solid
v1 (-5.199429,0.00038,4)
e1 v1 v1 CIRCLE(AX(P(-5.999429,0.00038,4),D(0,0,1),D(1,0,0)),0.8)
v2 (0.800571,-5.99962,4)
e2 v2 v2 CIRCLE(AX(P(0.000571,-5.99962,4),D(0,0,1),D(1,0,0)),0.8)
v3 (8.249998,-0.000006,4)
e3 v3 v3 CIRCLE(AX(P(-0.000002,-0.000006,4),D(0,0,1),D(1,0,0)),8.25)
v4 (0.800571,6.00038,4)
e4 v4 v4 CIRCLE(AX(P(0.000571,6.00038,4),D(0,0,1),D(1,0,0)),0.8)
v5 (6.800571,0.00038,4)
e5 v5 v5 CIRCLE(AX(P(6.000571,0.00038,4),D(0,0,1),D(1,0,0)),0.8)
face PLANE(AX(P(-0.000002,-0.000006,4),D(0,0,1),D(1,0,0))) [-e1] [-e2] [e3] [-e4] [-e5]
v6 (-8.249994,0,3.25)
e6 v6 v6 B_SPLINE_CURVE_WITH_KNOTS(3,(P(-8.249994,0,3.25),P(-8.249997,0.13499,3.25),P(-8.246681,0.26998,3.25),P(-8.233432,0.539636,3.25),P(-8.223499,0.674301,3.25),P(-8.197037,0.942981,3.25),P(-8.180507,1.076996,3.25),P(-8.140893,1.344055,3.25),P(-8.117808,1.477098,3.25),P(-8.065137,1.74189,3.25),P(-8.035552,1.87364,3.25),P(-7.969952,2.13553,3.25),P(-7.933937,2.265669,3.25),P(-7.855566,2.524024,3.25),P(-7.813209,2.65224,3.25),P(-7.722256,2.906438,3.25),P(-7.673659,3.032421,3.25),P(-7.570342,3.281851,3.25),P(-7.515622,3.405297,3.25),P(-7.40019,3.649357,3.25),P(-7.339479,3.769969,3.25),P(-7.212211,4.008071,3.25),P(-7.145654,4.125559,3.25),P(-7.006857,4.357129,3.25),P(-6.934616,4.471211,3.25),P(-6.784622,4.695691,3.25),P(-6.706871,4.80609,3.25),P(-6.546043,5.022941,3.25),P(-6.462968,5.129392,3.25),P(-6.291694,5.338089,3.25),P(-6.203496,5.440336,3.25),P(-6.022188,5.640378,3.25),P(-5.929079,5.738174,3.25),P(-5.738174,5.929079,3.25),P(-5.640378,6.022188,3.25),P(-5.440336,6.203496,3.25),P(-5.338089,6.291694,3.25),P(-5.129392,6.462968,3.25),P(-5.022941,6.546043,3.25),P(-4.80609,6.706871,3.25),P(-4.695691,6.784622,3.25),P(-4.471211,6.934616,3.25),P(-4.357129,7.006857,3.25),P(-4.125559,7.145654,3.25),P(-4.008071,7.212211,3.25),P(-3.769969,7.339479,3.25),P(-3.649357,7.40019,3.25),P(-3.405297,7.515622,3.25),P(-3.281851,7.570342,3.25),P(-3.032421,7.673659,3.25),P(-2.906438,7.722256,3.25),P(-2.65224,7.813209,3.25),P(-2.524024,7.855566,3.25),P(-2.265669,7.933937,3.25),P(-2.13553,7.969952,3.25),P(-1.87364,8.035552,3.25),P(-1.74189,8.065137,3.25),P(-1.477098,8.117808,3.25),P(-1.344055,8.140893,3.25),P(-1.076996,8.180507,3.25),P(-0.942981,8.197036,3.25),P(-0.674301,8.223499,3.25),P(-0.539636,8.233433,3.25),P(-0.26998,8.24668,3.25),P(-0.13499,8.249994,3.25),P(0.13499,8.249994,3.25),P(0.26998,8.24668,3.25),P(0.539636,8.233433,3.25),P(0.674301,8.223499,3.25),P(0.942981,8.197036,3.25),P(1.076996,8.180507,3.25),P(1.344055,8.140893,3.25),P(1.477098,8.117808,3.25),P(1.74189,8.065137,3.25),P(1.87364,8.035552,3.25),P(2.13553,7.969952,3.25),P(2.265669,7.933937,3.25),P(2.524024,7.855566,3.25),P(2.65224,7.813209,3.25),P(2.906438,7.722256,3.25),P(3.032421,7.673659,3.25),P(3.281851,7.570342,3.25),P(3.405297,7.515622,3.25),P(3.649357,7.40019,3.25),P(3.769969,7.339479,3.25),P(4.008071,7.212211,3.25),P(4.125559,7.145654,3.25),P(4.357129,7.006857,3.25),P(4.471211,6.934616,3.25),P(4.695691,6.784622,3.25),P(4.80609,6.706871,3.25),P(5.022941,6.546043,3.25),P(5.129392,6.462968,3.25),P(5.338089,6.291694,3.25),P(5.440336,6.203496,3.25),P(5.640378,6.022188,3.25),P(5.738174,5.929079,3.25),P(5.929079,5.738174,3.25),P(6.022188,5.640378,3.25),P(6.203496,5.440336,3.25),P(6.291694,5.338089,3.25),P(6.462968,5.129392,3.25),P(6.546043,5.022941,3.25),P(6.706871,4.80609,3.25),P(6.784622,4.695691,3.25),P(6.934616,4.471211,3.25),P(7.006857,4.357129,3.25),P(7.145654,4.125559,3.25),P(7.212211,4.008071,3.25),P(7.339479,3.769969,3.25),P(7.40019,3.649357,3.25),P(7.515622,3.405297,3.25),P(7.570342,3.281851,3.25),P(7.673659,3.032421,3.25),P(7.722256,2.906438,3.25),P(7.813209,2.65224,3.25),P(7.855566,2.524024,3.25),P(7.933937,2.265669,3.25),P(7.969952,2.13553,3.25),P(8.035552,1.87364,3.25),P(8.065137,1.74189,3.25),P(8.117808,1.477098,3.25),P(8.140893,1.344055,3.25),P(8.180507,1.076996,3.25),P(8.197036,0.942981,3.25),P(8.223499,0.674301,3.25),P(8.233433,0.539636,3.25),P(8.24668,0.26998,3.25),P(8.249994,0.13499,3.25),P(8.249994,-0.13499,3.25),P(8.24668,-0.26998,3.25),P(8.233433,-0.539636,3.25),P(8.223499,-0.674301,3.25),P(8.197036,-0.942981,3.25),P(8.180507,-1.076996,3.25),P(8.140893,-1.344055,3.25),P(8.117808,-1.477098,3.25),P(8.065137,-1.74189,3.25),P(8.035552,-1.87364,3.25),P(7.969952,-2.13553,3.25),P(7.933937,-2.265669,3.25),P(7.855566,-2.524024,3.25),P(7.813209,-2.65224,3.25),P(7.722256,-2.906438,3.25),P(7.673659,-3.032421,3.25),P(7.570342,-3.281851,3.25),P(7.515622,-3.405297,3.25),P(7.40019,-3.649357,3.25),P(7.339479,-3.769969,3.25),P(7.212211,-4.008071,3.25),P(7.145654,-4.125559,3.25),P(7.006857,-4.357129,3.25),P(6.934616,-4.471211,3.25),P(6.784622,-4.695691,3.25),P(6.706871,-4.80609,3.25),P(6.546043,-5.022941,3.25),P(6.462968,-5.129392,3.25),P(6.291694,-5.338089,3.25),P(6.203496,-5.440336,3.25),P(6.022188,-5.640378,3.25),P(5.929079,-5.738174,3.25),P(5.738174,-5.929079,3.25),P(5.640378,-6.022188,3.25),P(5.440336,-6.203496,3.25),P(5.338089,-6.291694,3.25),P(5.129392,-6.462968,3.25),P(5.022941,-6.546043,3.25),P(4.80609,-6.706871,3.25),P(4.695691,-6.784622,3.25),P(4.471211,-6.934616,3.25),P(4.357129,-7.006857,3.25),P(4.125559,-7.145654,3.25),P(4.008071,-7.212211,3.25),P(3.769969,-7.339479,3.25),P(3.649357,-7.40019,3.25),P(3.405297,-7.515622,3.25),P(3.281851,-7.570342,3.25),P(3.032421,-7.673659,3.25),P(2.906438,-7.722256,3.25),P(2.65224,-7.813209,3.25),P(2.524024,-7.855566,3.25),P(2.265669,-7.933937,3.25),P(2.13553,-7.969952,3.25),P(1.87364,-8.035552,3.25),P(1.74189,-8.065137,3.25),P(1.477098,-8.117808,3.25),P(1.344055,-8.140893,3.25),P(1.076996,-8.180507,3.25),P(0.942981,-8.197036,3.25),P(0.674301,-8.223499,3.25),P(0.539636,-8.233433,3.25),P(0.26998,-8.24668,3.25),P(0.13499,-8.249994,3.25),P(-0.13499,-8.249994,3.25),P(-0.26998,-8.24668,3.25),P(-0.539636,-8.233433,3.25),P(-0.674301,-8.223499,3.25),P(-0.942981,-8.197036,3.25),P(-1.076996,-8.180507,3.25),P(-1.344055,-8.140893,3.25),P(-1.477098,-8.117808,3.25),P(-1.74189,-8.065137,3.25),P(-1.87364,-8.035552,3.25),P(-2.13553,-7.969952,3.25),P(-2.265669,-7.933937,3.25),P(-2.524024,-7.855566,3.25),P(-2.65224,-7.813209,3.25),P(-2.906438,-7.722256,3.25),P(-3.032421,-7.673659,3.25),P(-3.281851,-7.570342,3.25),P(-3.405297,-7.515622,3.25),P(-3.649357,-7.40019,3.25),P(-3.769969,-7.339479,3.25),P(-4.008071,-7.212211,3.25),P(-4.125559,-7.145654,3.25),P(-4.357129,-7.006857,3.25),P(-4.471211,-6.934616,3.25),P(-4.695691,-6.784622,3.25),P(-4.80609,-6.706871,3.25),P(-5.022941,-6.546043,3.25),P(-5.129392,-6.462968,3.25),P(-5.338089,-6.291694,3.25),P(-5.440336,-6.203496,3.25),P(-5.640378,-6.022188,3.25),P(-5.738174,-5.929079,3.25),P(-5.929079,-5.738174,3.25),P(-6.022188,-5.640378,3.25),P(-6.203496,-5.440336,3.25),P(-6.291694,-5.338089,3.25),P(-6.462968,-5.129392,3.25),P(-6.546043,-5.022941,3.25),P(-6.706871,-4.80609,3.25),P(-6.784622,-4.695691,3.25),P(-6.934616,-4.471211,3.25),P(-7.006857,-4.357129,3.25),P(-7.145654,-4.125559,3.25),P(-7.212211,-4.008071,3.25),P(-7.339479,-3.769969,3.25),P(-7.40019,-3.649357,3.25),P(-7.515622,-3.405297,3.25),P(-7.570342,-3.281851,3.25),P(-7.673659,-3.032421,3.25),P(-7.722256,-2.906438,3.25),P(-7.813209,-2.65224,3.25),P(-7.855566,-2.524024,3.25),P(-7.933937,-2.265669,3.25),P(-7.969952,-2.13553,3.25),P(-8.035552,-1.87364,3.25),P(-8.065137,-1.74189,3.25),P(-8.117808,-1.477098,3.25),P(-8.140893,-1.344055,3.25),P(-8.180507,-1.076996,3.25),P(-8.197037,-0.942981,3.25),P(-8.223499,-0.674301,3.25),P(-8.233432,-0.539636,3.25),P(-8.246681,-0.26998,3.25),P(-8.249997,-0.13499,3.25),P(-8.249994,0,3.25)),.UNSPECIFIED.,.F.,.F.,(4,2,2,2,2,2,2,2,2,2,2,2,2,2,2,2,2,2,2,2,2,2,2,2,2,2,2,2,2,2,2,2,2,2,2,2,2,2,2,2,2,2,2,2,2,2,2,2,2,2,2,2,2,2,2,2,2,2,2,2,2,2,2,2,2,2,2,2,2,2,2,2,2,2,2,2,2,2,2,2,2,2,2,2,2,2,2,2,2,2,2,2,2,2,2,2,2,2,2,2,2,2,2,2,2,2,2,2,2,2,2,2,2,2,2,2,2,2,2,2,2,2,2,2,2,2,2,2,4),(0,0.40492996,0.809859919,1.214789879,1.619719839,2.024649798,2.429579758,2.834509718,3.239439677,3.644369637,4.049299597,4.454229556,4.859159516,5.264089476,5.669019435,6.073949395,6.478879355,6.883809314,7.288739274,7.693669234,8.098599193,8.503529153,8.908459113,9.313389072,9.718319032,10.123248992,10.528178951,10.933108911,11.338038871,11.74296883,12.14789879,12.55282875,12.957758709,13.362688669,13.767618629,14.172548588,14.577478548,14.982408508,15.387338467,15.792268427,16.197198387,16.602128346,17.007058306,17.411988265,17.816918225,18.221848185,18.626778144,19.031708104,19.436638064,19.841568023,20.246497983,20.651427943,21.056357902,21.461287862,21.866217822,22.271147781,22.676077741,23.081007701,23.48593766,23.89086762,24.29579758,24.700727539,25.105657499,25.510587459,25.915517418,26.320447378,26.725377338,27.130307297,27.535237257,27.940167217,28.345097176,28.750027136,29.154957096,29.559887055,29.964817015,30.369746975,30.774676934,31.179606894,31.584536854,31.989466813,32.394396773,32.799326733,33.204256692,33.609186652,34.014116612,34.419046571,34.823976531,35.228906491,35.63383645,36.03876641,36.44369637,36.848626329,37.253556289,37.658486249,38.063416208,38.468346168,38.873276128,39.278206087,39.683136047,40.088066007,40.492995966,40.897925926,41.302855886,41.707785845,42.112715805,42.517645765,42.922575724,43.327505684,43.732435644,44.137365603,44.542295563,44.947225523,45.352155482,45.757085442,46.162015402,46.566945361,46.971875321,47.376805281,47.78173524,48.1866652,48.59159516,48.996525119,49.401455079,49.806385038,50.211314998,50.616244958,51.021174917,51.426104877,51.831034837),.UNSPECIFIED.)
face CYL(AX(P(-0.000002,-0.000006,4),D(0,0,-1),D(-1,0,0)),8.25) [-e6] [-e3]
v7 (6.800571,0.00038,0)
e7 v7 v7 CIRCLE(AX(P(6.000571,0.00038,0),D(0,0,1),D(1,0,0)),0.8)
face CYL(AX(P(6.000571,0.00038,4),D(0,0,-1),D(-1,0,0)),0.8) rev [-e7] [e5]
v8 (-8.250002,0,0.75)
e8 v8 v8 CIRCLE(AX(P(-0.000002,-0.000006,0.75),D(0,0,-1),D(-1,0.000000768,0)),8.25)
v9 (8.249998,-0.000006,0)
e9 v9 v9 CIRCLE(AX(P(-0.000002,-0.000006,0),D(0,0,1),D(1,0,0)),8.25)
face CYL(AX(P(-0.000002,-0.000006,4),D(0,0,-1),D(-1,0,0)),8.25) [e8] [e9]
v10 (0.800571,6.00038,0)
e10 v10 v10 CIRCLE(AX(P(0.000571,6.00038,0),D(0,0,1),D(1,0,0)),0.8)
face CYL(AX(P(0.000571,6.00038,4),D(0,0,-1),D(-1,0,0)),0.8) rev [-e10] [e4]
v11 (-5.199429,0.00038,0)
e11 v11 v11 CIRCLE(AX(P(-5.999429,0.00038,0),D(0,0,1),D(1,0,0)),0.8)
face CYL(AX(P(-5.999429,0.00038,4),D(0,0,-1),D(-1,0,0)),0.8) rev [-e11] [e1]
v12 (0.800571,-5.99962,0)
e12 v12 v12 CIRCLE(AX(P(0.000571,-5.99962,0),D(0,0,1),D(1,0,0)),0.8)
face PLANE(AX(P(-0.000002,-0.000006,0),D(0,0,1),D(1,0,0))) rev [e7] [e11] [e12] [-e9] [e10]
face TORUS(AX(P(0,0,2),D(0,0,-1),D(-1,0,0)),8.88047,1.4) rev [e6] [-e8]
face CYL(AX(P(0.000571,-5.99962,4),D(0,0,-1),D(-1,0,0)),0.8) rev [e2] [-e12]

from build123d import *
from OCP.BRepAlgoAPI import BRepAlgoAPI_Cut
from OCP.TopTools import TopTools_ListOfShape

# Parameters (mm, degrees)
SKIZZE2_R                       = 8.25
SKIZZE2_R_2                     = 0.8
AUFSATZ_LINEAR_AUSTRAGEN1_DEPTH = 4


with BuildPart() as part:
    # Skizze2 → Aufsatz-Linear austragen1 (new body)
    with BuildSketch(Plane.XY):
        with Locations((-1.64e-06, -6.336e-06)):
            Circle(SKIZZE2_R)
        with Locations((6.000570744, 0.000379921)):
            Circle(SKIZZE2_R_2, mode=Mode.SUBTRACT)
        with Locations((0.000570744, 6.000379921)):
            Circle(SKIZZE2_R_2, mode=Mode.SUBTRACT)
        with Locations((-5.999429256, 0.000379921)):
            Circle(SKIZZE2_R_2, mode=Mode.SUBTRACT)
        with Locations((0.000570744, -5.999620079)):
            Circle(SKIZZE2_R_2, mode=Mode.SUBTRACT)
    extrude(amount=AUFSATZ_LINEAR_AUSTRAGEN1_DEPTH)


with BuildPart() as schnitt_rotation4_tool:
    # Skizze5 → Schnitt-Rotation4 (revolve)
    with BuildSketch(Plane(origin=(0, 0, 0), x_dir=(0, 0, -1), z_dir=(1, 0, 0))):
        with BuildLine():
            Line((-3.25, 8.249993664), (-0.75, 8.249993664))
            ThreePointArc((-0.75, 8.249993664), (-2, 7.480469675), (-3.25, 8.249993664))
        make_face()
    revolve(axis=Axis((0, 0, 2), (0, 0, 1)))


with BuildPart() as part_1:
    add(part.part)

    # Schnitt-Rotation4: cut by schnitt_rotation4_tool, with a tolerance
    schnitt_rotation4_stock = TopTools_ListOfShape()
    schnitt_rotation4_stock.Append(part_1.part.wrapped)
    schnitt_rotation4_tools = TopTools_ListOfShape()
    schnitt_rotation4_tools.Append(schnitt_rotation4_tool.part.wrapped)
    schnitt_rotation4_cut = BRepAlgoAPI_Cut()
    schnitt_rotation4_cut.SetArguments(schnitt_rotation4_stock)
    schnitt_rotation4_cut.SetTools(schnitt_rotation4_tools)
    schnitt_rotation4_cut.SetFuzzyValue(0.00001)
    schnitt_rotation4_cut.Build()
    add(Compound.cast(schnitt_rotation4_cut.Shape()).solids(), mode=Mode.REPLACE)


solid = part_1.part
